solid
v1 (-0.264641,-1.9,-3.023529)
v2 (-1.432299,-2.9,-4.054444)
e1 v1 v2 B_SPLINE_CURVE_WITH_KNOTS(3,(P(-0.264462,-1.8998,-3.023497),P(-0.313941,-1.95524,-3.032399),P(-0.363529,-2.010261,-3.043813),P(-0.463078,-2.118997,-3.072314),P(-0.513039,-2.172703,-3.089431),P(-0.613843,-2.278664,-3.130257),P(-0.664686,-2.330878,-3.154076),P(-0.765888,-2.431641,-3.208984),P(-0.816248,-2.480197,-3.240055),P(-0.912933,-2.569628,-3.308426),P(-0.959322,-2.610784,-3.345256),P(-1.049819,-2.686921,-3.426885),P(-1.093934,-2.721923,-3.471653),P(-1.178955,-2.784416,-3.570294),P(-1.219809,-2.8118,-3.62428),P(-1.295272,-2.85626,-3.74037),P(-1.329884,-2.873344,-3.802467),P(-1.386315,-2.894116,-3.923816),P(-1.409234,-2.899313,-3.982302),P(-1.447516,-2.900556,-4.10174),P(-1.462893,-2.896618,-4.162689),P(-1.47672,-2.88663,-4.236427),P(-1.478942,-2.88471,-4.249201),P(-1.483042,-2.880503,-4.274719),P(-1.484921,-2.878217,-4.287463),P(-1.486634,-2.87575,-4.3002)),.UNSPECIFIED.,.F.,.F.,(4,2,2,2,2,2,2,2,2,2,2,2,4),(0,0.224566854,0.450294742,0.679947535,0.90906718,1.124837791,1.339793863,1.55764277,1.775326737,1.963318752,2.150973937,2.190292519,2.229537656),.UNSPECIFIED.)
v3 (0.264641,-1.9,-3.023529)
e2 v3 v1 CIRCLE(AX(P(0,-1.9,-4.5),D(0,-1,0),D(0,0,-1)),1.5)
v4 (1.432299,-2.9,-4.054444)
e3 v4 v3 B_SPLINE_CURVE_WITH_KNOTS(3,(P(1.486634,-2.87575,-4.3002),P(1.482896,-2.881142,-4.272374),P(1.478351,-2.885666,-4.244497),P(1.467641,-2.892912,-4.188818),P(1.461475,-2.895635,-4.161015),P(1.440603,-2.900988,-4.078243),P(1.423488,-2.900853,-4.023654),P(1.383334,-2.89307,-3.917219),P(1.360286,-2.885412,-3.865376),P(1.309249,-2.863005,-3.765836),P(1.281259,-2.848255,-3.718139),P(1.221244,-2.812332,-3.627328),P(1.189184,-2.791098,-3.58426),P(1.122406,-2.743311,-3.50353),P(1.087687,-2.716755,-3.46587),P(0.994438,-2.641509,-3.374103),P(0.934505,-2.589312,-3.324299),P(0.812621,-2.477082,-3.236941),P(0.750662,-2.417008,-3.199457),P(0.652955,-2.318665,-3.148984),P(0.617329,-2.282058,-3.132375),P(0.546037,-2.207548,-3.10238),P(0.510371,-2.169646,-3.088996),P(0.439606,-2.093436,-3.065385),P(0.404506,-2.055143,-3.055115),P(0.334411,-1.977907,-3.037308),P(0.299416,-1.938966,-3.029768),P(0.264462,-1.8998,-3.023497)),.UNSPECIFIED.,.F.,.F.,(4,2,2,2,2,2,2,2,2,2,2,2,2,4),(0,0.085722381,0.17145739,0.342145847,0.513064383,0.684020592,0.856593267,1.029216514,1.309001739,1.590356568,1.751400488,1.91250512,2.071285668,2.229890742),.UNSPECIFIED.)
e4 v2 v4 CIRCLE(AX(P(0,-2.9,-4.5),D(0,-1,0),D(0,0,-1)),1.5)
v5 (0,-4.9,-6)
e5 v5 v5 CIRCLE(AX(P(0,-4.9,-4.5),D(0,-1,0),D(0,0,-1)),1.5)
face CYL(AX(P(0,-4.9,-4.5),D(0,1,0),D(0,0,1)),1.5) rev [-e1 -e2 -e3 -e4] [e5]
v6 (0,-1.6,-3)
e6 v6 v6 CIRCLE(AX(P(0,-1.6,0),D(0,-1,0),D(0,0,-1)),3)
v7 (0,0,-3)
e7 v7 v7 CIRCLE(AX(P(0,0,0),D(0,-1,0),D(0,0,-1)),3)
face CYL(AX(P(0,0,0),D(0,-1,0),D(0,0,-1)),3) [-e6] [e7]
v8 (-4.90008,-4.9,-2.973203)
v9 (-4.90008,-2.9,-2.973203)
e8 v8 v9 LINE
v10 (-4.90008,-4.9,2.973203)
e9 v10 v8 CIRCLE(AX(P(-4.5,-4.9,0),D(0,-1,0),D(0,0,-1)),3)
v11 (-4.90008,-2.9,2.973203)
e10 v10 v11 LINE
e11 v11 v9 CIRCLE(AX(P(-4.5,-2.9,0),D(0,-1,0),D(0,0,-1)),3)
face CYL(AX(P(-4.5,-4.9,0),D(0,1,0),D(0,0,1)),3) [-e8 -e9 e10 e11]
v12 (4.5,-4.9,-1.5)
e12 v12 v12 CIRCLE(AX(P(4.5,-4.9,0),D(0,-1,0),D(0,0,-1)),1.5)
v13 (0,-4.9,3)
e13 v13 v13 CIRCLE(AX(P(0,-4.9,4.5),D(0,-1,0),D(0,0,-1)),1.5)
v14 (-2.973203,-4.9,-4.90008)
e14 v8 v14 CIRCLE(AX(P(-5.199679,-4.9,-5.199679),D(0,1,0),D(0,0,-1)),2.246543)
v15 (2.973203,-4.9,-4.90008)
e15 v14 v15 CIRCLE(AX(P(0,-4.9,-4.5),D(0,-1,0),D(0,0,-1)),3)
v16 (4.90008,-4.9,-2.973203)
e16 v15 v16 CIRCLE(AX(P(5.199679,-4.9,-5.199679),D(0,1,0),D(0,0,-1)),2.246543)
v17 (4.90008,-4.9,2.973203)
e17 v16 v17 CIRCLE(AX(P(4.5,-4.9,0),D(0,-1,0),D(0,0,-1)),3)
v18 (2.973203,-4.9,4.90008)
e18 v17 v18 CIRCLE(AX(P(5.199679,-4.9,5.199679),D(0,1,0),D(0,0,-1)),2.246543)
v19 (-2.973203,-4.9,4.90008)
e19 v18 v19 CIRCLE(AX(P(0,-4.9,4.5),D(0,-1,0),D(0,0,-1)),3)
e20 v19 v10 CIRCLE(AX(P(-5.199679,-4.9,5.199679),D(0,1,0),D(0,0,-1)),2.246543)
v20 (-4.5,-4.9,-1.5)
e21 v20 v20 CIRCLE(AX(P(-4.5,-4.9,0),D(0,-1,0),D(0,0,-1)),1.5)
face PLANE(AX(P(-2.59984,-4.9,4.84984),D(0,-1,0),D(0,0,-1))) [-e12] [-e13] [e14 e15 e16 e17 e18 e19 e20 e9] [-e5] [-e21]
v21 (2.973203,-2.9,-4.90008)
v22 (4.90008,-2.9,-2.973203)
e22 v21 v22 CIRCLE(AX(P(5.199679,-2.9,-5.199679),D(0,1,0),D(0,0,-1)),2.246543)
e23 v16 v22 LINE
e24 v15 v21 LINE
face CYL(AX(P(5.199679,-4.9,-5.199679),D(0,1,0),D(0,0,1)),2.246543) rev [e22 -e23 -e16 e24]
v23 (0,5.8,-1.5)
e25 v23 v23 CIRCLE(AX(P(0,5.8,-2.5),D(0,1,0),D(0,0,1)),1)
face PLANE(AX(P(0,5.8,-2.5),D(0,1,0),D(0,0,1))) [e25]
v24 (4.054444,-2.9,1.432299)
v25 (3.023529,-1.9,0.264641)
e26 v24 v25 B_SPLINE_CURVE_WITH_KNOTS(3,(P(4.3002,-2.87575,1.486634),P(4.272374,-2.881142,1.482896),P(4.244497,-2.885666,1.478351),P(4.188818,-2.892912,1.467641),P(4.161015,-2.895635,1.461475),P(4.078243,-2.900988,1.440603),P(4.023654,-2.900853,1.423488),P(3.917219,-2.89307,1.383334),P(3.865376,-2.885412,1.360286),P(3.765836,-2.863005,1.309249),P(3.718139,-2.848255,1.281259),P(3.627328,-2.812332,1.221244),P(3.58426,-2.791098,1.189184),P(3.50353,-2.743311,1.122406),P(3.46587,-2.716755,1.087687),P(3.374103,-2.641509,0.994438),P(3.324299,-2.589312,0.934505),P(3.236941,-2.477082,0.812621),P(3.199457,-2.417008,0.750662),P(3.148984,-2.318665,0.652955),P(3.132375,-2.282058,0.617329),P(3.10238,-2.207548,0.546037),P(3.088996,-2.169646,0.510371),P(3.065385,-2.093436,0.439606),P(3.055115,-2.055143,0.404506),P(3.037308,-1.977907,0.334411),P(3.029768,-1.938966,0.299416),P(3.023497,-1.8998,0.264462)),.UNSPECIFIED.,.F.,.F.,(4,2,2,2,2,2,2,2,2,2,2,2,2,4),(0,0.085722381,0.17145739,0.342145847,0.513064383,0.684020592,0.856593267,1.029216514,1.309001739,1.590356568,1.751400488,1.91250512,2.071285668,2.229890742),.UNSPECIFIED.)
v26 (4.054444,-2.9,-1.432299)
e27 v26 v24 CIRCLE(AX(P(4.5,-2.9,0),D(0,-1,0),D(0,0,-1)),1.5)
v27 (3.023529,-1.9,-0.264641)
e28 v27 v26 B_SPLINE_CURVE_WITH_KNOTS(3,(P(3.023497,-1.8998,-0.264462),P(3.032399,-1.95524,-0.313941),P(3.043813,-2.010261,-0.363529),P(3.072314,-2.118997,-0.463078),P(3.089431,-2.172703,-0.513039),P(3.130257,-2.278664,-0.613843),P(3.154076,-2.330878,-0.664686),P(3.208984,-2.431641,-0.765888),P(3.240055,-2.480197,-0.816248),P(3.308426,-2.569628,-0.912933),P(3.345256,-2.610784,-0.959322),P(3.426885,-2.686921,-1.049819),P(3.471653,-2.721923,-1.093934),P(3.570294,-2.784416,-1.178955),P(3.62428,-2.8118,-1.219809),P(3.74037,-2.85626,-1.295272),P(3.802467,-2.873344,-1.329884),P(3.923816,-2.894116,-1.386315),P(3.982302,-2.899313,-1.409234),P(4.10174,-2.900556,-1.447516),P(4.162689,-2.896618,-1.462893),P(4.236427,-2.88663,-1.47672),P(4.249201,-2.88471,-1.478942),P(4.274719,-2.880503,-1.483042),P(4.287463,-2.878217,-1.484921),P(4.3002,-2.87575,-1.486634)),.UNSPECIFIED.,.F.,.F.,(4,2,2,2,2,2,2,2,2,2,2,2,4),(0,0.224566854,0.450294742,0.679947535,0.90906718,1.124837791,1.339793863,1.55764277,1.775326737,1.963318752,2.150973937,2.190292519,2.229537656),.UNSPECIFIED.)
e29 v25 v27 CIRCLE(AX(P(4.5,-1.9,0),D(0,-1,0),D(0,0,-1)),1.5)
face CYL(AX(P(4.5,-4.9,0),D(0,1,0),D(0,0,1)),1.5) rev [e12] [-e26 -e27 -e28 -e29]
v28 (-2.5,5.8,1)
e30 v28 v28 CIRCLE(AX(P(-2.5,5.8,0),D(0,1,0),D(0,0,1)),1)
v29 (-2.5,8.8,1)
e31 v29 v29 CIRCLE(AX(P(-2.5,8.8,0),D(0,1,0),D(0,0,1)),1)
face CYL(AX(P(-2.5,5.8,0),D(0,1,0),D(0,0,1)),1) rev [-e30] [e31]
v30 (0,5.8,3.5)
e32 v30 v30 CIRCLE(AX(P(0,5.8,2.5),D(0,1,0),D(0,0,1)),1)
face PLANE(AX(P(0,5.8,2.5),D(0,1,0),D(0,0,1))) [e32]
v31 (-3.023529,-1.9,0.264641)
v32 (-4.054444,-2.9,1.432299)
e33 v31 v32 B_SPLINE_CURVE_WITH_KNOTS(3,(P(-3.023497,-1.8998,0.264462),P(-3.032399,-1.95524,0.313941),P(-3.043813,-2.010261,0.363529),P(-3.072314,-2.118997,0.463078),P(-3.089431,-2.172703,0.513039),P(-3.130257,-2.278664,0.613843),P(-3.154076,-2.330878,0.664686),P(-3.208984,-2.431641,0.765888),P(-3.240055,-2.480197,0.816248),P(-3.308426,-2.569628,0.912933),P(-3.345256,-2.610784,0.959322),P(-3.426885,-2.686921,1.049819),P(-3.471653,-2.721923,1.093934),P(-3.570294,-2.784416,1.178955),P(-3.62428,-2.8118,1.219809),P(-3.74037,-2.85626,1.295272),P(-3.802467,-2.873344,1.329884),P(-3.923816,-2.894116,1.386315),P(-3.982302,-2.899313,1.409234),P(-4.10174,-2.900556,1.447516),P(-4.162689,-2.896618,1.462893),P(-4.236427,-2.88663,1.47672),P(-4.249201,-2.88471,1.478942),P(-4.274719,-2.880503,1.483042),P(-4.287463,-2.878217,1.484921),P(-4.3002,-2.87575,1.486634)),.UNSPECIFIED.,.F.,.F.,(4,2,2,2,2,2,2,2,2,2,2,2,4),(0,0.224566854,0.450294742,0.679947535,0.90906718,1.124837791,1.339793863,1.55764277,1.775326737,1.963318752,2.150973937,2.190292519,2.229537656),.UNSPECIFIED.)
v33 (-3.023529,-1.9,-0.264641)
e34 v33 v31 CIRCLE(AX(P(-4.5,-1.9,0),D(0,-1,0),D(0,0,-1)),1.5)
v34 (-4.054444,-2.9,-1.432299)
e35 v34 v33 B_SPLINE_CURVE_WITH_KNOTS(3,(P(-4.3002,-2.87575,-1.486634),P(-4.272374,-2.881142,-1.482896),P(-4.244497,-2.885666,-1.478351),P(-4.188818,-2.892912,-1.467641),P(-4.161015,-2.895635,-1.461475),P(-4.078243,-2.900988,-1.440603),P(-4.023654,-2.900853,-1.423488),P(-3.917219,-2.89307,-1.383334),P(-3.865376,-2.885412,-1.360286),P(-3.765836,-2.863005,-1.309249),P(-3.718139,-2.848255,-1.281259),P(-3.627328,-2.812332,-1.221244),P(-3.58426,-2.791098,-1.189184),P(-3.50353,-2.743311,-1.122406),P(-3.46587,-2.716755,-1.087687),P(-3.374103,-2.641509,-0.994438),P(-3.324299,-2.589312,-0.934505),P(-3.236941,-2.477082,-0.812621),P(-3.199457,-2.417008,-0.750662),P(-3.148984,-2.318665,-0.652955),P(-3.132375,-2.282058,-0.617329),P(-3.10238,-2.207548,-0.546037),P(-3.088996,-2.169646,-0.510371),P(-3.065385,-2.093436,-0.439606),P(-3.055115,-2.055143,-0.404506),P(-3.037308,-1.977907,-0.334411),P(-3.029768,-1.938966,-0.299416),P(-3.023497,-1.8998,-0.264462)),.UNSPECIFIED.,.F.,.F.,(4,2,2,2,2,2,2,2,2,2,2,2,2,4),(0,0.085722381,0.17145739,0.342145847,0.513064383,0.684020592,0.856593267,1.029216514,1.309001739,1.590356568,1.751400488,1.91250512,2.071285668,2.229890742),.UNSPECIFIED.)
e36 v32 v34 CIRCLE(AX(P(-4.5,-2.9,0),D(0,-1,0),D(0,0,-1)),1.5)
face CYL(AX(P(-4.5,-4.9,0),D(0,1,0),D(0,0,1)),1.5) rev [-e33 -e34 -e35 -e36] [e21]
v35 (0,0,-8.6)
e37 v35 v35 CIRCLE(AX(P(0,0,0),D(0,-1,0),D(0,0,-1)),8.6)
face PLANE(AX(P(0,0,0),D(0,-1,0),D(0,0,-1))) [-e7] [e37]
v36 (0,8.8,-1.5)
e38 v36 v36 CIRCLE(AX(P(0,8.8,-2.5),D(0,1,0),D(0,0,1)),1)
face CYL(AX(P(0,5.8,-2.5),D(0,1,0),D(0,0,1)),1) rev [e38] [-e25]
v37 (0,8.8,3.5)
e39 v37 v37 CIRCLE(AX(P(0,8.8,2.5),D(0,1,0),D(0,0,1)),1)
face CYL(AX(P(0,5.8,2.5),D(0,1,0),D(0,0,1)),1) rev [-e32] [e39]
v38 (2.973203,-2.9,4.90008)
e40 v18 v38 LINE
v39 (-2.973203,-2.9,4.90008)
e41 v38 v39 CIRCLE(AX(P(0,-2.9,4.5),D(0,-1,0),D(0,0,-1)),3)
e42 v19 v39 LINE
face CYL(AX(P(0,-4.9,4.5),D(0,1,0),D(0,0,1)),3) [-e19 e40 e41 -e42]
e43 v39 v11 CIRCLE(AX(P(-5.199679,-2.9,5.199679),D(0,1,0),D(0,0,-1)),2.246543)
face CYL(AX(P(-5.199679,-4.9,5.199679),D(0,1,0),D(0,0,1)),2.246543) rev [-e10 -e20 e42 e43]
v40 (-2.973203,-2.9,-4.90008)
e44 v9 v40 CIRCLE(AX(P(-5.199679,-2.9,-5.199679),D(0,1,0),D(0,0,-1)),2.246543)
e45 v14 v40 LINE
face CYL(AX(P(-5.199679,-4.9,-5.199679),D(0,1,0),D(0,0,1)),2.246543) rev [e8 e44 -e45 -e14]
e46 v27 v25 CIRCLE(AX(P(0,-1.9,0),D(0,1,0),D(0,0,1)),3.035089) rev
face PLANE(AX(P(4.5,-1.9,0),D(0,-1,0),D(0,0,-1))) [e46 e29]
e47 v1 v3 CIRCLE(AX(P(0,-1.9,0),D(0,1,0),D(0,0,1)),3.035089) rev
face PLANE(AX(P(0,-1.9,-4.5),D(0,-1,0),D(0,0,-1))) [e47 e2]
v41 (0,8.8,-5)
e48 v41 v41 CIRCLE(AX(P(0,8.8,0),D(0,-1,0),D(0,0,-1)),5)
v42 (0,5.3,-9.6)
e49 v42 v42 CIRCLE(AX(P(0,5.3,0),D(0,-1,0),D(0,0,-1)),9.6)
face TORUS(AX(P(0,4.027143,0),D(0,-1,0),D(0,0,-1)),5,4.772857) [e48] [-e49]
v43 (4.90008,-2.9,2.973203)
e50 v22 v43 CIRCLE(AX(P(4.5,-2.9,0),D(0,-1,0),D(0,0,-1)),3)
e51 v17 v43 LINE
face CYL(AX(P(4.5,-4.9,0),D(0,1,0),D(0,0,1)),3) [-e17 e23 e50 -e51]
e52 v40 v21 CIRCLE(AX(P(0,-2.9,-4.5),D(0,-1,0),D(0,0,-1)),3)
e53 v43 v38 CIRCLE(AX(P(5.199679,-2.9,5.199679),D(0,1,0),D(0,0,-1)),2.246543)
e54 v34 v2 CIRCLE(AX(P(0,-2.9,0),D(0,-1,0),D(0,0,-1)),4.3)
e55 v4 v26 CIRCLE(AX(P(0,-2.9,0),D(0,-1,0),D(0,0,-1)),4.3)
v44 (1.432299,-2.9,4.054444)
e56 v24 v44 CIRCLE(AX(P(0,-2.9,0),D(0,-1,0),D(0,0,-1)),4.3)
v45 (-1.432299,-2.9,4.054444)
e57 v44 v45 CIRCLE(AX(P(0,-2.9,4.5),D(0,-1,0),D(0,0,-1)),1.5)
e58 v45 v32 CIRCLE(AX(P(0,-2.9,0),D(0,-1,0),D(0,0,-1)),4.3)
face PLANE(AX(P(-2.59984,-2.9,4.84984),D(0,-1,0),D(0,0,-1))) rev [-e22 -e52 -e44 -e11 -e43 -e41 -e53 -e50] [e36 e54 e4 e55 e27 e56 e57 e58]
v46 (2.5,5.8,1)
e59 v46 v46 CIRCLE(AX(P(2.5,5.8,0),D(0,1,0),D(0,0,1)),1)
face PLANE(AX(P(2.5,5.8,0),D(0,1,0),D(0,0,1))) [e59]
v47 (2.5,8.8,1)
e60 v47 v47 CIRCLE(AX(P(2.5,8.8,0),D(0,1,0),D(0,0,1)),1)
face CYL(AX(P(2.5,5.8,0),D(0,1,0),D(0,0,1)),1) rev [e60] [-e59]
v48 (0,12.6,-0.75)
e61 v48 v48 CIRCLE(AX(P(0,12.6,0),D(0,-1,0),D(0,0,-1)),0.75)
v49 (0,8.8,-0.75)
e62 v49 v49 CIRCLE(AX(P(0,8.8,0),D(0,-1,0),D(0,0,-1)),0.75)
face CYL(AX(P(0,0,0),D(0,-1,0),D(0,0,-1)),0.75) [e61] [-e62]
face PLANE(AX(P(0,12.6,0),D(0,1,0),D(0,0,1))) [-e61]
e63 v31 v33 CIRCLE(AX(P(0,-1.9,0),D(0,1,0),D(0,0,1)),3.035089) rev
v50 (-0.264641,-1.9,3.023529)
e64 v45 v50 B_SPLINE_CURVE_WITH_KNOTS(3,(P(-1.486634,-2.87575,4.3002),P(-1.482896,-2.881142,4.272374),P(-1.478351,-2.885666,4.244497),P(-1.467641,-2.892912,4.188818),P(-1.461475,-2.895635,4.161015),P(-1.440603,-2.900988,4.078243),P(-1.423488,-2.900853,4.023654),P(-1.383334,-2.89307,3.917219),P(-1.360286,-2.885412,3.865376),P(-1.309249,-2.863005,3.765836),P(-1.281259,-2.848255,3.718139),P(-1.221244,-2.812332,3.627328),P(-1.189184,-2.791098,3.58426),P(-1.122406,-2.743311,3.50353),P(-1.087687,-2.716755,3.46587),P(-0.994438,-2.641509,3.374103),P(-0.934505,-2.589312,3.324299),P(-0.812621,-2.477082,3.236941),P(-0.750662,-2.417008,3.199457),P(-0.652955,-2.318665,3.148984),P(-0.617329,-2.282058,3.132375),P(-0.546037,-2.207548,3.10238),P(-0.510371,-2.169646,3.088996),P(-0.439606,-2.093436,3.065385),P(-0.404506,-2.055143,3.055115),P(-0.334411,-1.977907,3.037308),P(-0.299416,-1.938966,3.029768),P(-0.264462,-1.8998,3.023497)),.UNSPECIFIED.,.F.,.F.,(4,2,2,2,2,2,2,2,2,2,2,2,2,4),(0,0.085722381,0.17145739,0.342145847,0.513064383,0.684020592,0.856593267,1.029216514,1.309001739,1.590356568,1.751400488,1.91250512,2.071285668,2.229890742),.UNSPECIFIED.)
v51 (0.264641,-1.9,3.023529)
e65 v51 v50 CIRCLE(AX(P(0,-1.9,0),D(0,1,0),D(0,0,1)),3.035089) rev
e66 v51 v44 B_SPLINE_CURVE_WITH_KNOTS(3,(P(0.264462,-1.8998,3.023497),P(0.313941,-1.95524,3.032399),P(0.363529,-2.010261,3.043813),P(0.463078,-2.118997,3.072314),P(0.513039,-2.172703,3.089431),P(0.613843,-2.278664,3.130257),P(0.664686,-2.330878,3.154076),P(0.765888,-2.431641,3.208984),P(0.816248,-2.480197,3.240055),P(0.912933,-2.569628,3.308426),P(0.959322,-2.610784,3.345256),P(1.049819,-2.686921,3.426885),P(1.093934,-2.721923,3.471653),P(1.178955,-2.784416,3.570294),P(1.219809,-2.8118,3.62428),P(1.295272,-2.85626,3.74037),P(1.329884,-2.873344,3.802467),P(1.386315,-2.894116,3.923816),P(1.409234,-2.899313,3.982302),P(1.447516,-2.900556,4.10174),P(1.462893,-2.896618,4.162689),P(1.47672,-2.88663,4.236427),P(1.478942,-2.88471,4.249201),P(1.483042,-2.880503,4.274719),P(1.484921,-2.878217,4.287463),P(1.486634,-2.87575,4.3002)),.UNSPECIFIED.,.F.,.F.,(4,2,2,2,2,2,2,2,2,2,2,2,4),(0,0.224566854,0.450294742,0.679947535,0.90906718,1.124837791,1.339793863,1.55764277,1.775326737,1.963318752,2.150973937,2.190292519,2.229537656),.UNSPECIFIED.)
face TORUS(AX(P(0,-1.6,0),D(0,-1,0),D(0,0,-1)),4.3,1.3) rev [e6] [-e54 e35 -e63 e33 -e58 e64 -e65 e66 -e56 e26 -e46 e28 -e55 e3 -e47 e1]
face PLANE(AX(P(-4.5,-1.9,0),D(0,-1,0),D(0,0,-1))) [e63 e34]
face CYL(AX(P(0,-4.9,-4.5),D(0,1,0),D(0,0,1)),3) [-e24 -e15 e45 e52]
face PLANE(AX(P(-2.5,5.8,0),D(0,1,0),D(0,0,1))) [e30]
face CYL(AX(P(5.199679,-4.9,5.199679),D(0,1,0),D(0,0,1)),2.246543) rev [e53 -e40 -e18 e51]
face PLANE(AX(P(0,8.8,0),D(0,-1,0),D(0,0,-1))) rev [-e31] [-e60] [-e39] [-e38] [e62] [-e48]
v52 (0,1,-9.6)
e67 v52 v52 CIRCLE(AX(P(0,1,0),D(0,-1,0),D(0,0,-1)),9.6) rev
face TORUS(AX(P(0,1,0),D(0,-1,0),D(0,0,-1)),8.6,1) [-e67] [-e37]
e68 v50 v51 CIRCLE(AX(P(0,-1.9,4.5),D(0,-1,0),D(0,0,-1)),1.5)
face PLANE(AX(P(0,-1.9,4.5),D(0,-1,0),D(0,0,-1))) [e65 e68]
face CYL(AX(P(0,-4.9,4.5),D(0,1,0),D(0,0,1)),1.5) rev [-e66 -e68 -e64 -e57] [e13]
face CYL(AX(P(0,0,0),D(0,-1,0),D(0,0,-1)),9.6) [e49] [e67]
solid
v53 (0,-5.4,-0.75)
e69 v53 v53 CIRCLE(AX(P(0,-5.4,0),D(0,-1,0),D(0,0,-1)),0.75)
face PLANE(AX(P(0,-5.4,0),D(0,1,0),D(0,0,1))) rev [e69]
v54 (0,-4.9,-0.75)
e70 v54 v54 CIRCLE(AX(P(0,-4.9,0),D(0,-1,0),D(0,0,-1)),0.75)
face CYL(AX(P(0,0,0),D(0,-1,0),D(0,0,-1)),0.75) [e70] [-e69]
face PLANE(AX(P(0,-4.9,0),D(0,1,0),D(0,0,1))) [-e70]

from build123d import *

# Parameters (mm, degrees)
REVOLVE_START       = -5.4
REVOLVE_4_OUTLINE_R = 0.75
REVOLVE_4_DEPTH     = 0.5
SKETCH_6_R          = 1.5
EXTRUDE_2_DEPTH     = 2
FILLET_2_R          = 1
SKETCH_8_R          = 1.5
CUT_EXTRUDE_1_DEPTH = 3
SKETCH_10_R         = 1
CUT_EXTRUDE_2_DEPTH = 3


with BuildPart() as part:
    # 旋转4: read off the stored shape, not the designer's step
    # 旋转4 outline → 旋转4 (new body)
    with BuildSketch(Plane(origin=(0, 0, 0), x_dir=(1, 0, 0), z_dir=(0, 1, 0)).offset(REVOLVE_START)):
        Circle(REVOLVE_4_OUTLINE_R)
    extrude(amount=REVOLVE_4_DEPTH)


with BuildPart() as body_2:
    # Revolve 4 2 outline → Revolve 4 2 (revolve)
    with BuildSketch(Plane.XY):
        with BuildLine():
            Line((9.6, 0), (9.6, 5.3))
            ThreePointArc((9.6, 5.3), (7.890069203, 7.825519524), (5, 8.8))
            Line((5, 8.8), (0.75, 8.8))
            Line((0.75, 8.8), (0.75, 12.6))
            Line((0.75, 12.6), (0, 12.6))
            Line((0, 12.6), (0, -2.9))
            Line((0, -2.9), (4.3, -2.9))
            ThreePointArc((4.3, -2.9), (3.380761184, -2.519238816), (3, -1.6))
            Line((3, -1.6), (3, 0))
            Line((3, 0), (9.6, 0))
        make_face()
    revolve(axis=Axis((0, 0, 0), (0, 1, 0)))

    # 草图6 → 凸台-拉伸2 (add)
    with BuildSketch(Plane.XZ.offset(2.9)):
        with BuildLine():
            ThreePointArc((2.973202969, 4.900080125), (3.611133324, 3.611133324), (4.900080125, 2.973202969))
            ThreePointArc((4.900080125, 2.973202969), (7.5, 0), (4.900080125, -2.973202969))
            ThreePointArc((4.900080125, -2.973202969), (3.611133324, -3.611133324), (2.973202969, -4.900080125))
            ThreePointArc((2.973202969, -4.900080125), (0, -7.5), (-2.973202969, -4.900080125))
            ThreePointArc((-2.973202969, -4.900080125), (-3.611133324, -3.611133324), (-4.900080125, -2.973202969))
            ThreePointArc((-4.900080125, -2.973202969), (-7.5, 0), (-4.900080125, 2.973202969))
            ThreePointArc((-4.900080125, 2.973202969), (-3.611133324, 3.611133324), (-2.973202969, 4.900080125))
            ThreePointArc((-2.973202969, 4.900080125), (0, 7.5), (2.973202969, 4.900080125))
        make_face()
        with Locations(Location((0, 4.5, 0), (0, 0, 197.279727309))):
            Circle(SKETCH_6_R, mode=Mode.SUBTRACT)
        with Locations(Location((4.5, 0, 0), (0, 0, 107.279727309))):
            Circle(SKETCH_6_R, mode=Mode.SUBTRACT)
        with Locations(Location((0, -4.5, 0), (0, 0, 17.279727309))):
            Circle(SKETCH_6_R, mode=Mode.SUBTRACT)
        with Locations(Location((-4.5, 0, 0), (0, 0, 72.720272691))):
            Circle(SKETCH_6_R, mode=Mode.SUBTRACT)
    extrude(amount=EXTRUDE_2_DEPTH)

    # 圆角2
    fillet_2_edges = [body_2.edges().sort_by_distance(p)[0] for p in [
        (-9.6, 0, 0),
    ]]
    fillet(fillet_2_edges, radius=FILLET_2_R)

    # 草图8 → 切除-拉伸1 (cut)
    with BuildSketch(Plane.XZ.offset(4.9)):
        with Locations(Location((0, 4.5, 0), (0, 0, 197.279727309))):
            Circle(SKETCH_8_R)
        with Locations(Location((4.5, 0, 0), (0, 0, 107.279727309))):
            Circle(SKETCH_8_R)
        with Locations(Location((0, -4.5, 0), (0, 0, 100.161715408))):
            Circle(SKETCH_8_R)
        with Locations(Location((-4.5, 0, 0), (0, 0, 72.72027268))):
            Circle(SKETCH_8_R)
    extrude(amount=-CUT_EXTRUDE_1_DEPTH, mode=Mode.SUBTRACT)

    # 草图10 → 切除-拉伸2 (cut)
    with BuildSketch(Plane(origin=(0, 8.8, 0), x_dir=(1, 0, 0), z_dir=(0, 1, 0))):
        with Locations(Location((2.5, 0, 0), (0, 0, 270))):
            Circle(SKETCH_10_R)
        with Locations(Location((0, -2.5, 0), (0, 0, 270))):
            Circle(SKETCH_10_R)
        with Locations(Location((-2.5, 0, 0), (0, 0, 270))):
            Circle(SKETCH_10_R)
        with Locations(Location((0, 2.5, 0), (0, 0, 270))):
            Circle(SKETCH_10_R)
    extrude(amount=-CUT_EXTRUDE_2_DEPTH, mode=Mode.SUBTRACT)


solid = Compound([part.part, body_2.part])
